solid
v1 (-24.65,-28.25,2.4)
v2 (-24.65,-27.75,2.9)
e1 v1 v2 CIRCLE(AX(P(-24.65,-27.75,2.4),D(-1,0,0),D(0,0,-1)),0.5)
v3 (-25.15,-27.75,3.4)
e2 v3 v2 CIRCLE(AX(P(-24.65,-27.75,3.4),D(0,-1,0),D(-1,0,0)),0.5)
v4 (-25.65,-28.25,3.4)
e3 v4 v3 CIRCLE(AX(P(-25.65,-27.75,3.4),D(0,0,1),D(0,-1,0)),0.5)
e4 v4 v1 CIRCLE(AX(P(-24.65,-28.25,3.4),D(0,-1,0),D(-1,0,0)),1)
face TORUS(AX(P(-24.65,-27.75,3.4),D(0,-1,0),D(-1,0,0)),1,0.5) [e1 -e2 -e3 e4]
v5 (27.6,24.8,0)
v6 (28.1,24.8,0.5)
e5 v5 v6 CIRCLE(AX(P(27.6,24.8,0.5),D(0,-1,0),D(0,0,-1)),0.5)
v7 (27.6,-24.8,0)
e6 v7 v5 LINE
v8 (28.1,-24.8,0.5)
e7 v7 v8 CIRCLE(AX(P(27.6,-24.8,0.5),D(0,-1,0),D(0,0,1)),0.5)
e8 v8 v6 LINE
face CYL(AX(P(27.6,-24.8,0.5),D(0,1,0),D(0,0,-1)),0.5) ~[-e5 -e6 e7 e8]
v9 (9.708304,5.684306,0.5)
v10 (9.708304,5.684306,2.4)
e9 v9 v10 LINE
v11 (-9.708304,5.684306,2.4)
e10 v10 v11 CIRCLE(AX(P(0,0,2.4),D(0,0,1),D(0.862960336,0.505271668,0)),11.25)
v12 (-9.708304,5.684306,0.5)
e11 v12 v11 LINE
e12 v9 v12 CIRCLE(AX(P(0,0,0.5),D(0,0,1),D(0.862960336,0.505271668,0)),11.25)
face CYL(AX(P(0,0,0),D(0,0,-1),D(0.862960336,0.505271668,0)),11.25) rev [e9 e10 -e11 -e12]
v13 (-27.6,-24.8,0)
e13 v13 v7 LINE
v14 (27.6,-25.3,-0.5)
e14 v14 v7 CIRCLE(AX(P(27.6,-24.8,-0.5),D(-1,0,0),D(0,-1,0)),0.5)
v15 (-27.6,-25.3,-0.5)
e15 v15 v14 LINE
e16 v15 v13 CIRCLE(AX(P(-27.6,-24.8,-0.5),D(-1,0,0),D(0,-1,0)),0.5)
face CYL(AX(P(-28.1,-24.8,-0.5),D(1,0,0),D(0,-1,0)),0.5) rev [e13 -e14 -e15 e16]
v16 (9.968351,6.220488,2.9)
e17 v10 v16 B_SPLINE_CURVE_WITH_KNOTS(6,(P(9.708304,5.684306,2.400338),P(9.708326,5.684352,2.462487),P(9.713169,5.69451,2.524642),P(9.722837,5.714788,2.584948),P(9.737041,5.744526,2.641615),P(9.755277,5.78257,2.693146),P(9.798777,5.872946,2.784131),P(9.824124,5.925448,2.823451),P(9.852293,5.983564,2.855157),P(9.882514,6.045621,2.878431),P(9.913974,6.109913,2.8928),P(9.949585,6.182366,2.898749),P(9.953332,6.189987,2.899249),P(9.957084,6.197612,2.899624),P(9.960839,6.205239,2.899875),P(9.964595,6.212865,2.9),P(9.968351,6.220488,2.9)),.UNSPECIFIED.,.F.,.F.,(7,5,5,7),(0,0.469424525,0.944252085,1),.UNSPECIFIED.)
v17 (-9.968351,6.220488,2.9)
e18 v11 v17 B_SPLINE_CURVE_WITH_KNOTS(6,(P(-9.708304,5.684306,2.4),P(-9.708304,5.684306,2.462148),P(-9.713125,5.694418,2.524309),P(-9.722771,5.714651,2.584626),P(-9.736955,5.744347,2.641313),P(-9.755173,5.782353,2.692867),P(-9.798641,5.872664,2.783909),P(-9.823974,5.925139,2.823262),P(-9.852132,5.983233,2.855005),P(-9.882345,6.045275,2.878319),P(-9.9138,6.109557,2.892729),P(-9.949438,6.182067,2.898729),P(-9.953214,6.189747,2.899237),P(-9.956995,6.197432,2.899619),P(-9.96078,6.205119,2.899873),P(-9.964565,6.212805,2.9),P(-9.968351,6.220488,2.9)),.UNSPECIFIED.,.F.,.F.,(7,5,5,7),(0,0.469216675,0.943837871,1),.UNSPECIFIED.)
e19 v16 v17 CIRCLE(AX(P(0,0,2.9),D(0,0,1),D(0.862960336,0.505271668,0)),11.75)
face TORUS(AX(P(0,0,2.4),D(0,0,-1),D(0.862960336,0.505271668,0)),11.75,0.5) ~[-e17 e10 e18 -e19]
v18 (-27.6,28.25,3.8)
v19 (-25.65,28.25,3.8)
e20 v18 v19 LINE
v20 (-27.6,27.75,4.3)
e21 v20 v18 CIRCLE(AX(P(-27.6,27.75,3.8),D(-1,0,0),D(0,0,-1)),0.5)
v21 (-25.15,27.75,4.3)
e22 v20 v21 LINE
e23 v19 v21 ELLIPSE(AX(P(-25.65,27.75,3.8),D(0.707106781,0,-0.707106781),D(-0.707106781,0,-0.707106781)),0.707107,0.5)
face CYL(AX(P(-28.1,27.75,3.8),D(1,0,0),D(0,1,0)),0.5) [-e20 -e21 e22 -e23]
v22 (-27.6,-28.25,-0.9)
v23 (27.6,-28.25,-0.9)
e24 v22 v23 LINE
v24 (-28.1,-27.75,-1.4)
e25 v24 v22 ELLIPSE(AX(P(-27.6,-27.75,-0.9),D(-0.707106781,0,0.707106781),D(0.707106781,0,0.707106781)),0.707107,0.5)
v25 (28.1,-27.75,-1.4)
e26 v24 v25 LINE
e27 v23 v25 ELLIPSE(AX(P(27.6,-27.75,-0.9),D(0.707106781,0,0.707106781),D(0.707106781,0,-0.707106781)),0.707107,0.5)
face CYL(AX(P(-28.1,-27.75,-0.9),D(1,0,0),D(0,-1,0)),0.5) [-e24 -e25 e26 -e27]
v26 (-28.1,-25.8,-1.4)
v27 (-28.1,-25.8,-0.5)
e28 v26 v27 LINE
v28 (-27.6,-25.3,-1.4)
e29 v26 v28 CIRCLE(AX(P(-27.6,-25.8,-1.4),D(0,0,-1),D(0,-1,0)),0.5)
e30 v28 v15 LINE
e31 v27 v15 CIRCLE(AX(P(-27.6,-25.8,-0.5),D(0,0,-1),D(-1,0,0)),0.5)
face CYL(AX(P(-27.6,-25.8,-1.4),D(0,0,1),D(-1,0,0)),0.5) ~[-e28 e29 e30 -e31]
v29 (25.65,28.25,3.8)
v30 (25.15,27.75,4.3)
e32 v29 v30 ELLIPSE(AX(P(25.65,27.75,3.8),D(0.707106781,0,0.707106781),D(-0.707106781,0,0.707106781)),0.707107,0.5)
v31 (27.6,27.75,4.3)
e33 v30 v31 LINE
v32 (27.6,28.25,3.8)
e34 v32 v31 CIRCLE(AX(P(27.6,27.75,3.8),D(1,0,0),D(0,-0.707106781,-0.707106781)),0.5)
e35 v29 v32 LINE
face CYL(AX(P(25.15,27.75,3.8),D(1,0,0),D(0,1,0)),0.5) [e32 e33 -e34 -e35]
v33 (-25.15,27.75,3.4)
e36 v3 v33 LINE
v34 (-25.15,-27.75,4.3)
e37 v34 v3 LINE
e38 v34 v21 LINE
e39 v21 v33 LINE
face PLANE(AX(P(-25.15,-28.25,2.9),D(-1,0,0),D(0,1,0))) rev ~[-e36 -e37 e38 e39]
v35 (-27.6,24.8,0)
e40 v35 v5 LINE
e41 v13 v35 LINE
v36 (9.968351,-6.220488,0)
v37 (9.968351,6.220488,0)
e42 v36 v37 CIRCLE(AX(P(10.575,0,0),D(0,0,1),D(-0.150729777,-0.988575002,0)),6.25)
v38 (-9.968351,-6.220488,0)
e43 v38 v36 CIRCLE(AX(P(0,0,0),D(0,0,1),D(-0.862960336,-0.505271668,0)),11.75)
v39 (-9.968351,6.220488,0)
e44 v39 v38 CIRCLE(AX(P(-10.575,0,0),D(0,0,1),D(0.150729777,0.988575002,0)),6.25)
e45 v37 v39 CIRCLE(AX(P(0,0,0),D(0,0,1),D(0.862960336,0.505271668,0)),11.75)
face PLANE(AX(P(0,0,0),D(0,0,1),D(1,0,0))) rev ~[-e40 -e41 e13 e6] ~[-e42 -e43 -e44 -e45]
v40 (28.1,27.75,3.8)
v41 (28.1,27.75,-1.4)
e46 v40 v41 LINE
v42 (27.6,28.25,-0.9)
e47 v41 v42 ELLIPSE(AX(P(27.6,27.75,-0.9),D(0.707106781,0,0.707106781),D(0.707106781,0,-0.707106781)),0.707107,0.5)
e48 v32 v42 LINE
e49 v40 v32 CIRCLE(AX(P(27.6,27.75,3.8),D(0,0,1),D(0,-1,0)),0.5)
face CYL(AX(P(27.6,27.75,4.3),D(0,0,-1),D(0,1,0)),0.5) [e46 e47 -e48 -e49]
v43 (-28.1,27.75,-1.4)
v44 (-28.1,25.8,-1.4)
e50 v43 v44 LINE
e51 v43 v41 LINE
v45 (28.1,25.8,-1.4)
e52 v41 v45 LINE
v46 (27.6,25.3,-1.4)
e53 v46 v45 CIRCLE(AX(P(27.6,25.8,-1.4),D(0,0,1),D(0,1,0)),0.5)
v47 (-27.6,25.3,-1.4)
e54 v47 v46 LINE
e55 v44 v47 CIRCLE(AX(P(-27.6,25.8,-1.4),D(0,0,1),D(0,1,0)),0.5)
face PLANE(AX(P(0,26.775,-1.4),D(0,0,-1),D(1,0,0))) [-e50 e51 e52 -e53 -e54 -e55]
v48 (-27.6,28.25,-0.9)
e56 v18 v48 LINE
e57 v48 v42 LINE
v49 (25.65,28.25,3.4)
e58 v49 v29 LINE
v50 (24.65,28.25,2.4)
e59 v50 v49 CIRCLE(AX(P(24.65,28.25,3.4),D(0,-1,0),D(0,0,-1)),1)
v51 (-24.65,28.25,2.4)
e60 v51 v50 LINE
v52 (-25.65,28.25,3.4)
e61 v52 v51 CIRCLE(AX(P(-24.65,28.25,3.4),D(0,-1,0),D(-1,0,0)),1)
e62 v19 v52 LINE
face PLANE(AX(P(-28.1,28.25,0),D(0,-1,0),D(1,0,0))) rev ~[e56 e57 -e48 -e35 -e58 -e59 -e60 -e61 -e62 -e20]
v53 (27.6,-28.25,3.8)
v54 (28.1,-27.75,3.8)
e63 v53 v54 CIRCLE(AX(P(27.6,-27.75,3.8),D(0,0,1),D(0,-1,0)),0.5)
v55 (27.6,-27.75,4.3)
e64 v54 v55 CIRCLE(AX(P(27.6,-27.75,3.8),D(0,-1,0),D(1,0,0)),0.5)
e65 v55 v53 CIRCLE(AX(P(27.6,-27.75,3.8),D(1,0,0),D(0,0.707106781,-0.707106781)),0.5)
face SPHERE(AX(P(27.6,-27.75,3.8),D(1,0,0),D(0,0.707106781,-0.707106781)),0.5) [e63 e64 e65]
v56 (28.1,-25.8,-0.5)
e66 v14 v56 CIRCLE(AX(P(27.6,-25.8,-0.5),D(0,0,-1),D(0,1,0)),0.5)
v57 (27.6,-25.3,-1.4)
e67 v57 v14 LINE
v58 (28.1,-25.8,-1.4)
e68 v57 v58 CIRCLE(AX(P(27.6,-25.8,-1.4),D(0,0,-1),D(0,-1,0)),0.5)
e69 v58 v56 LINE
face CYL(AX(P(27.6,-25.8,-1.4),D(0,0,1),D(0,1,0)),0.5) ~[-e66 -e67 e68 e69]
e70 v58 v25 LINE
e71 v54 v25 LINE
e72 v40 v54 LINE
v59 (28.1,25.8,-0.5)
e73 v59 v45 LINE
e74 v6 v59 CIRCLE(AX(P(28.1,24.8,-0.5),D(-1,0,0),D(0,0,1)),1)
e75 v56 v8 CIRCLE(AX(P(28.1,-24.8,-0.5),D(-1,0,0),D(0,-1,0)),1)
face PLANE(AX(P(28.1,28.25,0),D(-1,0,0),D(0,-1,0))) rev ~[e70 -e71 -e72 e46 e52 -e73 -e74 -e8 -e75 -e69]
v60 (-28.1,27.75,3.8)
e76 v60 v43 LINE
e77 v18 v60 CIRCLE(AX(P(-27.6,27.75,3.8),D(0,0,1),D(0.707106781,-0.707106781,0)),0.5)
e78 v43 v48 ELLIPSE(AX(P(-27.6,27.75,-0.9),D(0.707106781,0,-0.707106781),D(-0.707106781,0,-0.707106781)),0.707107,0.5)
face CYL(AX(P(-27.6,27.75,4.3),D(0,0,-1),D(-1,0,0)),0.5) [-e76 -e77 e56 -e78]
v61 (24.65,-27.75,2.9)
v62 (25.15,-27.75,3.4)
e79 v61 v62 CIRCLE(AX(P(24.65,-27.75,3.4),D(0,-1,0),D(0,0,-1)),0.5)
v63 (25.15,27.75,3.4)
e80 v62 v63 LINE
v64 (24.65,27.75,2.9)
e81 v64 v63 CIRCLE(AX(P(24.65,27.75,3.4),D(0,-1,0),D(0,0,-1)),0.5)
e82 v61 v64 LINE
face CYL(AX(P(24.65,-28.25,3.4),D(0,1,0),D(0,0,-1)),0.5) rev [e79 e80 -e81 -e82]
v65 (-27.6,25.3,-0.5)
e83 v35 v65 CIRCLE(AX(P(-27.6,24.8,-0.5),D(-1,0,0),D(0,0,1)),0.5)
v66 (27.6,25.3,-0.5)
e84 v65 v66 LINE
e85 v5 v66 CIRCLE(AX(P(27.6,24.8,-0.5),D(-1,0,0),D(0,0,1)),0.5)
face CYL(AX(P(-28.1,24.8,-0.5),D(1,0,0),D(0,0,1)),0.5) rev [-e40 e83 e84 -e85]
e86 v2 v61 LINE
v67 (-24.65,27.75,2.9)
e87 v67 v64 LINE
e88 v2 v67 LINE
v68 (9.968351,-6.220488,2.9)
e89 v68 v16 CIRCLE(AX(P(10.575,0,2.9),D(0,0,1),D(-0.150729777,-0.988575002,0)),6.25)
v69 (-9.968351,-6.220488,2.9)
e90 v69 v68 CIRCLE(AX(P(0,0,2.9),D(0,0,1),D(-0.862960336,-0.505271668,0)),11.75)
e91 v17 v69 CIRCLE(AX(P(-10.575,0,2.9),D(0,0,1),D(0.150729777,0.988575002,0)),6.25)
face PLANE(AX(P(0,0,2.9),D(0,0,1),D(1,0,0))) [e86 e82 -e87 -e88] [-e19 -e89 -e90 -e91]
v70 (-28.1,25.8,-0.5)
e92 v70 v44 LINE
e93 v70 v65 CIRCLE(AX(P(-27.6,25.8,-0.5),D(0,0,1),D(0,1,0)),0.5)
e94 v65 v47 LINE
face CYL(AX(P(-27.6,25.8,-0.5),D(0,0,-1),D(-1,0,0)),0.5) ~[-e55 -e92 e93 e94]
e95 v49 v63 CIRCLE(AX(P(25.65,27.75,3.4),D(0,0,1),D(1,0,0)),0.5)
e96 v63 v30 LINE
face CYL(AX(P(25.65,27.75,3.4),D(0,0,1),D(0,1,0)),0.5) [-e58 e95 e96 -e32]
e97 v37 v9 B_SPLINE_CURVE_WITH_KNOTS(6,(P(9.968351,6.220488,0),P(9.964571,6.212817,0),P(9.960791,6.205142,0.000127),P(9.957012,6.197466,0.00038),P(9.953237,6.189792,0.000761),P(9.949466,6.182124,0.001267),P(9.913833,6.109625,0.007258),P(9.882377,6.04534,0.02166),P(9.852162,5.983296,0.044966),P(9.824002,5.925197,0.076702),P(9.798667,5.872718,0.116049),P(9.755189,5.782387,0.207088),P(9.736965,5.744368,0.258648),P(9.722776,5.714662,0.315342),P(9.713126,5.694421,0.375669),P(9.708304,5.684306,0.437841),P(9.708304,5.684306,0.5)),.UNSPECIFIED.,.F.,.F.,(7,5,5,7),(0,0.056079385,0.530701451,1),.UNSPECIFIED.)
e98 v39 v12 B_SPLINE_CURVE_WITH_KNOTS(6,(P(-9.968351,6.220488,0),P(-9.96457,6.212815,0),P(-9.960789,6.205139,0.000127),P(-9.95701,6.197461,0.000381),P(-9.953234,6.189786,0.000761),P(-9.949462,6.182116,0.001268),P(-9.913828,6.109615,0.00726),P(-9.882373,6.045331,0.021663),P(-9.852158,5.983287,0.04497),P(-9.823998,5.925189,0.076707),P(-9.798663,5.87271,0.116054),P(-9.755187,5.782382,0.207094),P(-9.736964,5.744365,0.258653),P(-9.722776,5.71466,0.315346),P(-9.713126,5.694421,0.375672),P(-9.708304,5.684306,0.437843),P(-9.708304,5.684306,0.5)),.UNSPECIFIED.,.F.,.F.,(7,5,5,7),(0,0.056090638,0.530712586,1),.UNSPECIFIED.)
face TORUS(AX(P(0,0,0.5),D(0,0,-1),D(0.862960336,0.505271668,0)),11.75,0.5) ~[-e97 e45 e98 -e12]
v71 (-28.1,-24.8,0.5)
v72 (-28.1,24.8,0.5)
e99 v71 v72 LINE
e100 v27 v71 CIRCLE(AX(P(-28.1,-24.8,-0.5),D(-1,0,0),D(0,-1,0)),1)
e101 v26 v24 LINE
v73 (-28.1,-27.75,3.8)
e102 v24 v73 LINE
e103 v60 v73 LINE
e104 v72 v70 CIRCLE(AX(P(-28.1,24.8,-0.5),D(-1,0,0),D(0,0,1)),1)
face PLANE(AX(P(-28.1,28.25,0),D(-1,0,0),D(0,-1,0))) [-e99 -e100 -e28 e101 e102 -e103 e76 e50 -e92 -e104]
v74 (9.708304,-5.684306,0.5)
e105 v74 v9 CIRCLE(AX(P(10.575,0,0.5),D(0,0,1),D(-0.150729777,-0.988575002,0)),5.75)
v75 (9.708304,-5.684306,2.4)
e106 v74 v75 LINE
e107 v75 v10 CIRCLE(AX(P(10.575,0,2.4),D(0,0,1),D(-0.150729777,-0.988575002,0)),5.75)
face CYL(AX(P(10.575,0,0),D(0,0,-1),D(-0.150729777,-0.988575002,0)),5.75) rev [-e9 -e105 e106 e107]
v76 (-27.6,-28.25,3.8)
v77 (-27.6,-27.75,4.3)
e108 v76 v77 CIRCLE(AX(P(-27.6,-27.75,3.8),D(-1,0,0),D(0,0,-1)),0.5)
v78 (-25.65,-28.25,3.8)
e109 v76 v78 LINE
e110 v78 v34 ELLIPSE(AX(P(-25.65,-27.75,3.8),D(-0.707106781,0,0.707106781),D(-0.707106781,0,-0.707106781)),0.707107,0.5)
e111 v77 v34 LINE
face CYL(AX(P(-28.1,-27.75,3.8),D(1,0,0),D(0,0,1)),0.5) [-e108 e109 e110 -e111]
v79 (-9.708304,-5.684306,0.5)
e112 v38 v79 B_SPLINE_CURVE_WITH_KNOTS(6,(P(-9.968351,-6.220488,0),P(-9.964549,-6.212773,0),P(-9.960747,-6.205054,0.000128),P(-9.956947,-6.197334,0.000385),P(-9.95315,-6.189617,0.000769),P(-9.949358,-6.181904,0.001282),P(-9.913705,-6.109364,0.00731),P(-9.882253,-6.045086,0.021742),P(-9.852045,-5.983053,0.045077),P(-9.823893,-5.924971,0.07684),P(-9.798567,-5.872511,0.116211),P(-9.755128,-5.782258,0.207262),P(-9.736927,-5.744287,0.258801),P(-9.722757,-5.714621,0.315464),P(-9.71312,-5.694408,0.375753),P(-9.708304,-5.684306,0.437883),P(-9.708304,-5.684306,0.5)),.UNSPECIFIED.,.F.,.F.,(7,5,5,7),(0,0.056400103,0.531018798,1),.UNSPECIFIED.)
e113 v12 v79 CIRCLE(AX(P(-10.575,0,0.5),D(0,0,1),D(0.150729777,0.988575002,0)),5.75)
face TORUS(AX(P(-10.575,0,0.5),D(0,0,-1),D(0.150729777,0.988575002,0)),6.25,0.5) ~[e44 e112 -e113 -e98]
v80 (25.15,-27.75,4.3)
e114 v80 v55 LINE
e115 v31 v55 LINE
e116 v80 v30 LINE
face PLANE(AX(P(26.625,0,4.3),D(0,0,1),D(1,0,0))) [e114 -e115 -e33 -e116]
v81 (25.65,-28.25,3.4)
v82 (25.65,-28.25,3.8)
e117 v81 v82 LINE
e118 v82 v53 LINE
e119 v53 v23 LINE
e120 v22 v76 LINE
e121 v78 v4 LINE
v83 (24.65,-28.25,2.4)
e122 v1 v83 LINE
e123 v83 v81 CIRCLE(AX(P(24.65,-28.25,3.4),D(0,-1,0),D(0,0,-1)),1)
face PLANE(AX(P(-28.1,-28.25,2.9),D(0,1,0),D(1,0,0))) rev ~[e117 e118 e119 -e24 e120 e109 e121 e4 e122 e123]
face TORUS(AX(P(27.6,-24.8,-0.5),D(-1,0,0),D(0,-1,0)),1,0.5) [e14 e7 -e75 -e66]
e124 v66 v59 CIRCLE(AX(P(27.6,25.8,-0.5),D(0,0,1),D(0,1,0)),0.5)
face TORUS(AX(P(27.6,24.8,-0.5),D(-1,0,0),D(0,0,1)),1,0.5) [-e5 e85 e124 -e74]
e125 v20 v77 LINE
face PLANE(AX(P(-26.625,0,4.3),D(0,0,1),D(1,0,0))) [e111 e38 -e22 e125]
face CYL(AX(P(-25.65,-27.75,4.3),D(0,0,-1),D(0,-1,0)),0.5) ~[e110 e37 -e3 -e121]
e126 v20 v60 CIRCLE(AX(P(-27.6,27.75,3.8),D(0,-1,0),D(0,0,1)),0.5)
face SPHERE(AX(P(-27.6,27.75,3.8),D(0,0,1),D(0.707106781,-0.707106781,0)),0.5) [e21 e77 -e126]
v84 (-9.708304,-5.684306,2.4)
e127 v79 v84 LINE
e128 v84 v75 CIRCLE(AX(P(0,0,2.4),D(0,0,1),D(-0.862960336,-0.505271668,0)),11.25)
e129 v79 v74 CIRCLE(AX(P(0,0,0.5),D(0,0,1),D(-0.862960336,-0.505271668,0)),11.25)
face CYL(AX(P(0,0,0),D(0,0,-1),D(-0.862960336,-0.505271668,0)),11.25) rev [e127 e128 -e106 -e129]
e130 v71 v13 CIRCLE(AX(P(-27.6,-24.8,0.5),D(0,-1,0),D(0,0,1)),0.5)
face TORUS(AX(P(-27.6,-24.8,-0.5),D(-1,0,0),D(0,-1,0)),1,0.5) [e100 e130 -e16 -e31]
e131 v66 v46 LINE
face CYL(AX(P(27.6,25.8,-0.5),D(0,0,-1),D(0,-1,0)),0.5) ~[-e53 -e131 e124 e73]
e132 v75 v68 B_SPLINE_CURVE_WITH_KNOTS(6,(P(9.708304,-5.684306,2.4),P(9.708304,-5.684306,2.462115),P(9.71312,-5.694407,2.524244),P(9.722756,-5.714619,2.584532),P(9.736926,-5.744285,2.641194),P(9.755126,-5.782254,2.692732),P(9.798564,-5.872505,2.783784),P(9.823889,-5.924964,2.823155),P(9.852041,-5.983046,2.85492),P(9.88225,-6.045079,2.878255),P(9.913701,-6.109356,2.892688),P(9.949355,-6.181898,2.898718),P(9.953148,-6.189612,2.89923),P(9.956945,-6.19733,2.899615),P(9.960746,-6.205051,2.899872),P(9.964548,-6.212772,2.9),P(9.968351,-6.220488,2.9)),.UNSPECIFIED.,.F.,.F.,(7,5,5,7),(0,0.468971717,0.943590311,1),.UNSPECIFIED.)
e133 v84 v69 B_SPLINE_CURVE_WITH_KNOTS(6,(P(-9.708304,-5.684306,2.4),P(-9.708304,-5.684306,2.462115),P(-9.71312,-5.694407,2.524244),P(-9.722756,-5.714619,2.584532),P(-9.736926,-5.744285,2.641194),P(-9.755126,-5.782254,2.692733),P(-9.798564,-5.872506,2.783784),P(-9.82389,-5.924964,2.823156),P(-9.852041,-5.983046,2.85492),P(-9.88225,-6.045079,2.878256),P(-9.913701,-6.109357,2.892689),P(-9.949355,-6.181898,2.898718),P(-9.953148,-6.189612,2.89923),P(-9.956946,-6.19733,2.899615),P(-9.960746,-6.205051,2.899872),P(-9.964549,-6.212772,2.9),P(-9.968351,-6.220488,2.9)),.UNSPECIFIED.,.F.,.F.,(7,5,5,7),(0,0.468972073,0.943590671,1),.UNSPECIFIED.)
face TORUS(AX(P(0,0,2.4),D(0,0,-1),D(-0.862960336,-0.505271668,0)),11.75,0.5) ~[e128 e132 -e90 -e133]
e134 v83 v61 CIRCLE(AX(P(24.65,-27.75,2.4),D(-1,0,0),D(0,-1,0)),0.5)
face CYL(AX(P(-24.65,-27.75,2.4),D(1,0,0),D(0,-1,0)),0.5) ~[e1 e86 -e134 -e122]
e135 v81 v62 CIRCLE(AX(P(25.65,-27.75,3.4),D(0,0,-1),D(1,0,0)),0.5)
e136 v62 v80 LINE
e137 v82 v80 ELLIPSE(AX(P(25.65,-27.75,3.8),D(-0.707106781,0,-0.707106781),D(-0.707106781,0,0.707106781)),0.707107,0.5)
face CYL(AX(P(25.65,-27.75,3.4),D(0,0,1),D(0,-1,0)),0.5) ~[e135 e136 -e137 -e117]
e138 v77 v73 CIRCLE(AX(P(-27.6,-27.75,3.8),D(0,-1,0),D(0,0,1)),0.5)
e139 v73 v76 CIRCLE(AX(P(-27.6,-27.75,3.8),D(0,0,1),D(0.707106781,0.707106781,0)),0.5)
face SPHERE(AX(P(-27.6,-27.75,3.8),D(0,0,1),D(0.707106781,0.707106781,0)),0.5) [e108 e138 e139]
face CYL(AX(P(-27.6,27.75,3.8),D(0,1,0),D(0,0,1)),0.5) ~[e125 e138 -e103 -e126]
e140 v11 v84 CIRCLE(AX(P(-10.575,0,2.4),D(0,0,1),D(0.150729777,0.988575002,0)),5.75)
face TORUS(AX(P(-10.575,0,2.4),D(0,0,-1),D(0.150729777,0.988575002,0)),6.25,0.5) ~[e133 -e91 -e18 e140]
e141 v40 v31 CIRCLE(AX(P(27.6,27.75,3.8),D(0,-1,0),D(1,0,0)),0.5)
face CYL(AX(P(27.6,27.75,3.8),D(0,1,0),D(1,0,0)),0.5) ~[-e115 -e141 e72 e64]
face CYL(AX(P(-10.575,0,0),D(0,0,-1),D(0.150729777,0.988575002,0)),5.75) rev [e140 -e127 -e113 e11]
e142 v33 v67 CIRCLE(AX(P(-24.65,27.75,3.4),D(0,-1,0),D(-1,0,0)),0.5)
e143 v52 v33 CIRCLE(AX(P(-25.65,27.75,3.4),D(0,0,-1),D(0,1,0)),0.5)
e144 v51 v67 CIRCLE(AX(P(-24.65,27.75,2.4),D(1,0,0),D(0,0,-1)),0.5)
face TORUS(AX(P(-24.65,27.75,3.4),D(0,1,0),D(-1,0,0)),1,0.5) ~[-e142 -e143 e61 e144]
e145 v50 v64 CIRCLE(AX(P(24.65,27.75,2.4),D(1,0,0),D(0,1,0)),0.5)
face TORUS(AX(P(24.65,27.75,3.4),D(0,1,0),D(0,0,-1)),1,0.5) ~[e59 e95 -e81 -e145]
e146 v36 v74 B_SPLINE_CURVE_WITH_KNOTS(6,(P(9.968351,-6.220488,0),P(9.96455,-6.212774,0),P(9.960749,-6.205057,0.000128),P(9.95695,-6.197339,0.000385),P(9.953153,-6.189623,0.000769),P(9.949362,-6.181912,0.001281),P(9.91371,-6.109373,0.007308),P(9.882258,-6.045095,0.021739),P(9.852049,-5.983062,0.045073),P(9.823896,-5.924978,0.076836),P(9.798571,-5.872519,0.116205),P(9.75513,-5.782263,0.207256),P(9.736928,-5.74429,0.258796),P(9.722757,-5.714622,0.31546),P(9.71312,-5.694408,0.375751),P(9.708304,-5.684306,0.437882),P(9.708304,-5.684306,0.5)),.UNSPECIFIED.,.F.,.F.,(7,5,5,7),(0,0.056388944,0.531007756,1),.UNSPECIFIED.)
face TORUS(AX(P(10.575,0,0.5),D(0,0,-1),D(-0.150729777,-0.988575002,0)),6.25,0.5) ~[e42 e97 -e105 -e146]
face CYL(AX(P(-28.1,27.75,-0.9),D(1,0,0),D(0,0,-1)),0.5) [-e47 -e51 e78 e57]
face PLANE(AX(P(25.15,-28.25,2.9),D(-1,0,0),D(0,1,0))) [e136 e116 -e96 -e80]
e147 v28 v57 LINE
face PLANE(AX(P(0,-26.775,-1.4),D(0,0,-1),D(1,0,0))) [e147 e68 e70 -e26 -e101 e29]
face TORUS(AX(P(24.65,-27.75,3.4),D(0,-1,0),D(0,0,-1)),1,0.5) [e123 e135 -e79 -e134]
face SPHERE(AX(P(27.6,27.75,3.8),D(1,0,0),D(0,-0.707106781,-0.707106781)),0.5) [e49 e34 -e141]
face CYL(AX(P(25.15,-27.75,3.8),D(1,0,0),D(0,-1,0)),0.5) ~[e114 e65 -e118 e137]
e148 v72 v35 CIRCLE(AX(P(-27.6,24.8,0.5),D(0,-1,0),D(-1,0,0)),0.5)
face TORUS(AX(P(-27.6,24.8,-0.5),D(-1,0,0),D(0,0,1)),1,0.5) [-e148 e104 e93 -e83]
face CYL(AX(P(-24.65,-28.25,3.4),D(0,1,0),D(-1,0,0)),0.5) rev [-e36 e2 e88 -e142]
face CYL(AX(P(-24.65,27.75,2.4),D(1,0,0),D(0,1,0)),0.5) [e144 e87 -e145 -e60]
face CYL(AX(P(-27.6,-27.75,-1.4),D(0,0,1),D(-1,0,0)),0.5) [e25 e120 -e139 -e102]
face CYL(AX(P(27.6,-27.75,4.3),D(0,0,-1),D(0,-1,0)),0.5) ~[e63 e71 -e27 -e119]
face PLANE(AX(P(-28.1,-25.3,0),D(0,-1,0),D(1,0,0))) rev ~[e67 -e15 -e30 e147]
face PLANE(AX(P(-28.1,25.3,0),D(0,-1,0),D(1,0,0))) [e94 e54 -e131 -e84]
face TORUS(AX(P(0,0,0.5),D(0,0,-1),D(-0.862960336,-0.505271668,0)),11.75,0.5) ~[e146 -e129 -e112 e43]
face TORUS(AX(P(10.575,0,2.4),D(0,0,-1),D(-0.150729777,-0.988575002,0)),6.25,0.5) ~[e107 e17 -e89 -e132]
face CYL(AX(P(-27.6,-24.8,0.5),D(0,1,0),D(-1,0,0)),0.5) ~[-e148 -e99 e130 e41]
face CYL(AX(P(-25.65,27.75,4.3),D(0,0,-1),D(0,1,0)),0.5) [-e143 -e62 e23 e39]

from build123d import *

# Parameters (mm, degrees)
F0_W         = 56.2
F0_H         = 56.5
F1_DEPTH     = 2.9
F3_DEPTH     = 2.9
F4_W         = 2.95
F4_H         = 56.5
F5_DEPTH     = 1.4
F6_W         = 56.2
F6_H         = 2.95
F7_DEPTH     = 1.4
F8_F1_R      = 0.5
F8_F2_R      = 0.5
F9_T1_DEPTH  = 55.5
F9_S5_W      = 0.5
F9_S5_H      = 0.5
F9_T6_DEPTH  = 0.5
F9_S11_W     = 0.5
F9_S11_H     = 0.5
F9_T12_DEPTH = 0.5
F9_S17_W     = 0.5
F9_S17_H     = 0.5
F9_T18_DEPTH = 0.5
F9_S23_W     = 0.5
F9_S23_H     = 0.5
F9_T24_DEPTH = 0.5


# Not quite as in the source:
# - a fillet or chamfer that OpenCascade refuses, or shapes differently, is made with other operations: its cross-section is extruded or revolved along the edge and cut away or added


with BuildPart() as f1:
    # F0 (on Top) → F1 (new body)
    with BuildSketch(Plane.XY):
        Rectangle(F0_W, F0_H)
    extrude(amount=F1_DEPTH)

    # F2 (on Top) → F3 (cut, through all)
    with BuildSketch(Plane.XY):
        with BuildLine():
            ThreePointArc((9.7083037825, -5.6843062608), (16.325, 0), (9.7083037825, 5.6843062608))
            ThreePointArc((9.7083037825, 5.6843062608), (0, 11.25), (-9.7083037825, 5.6843062608))
            ThreePointArc((-9.7083037825, 5.6843062608), (-16.325, 0), (-9.7083037825, -5.6843062608))
            ThreePointArc((-9.7083037825, -5.6843062608), (0, -11.25), (9.7083037825, -5.6843062608))
        make_face()
    extrude(amount=F3_DEPTH, mode=Mode.SUBTRACT)

    # F4 (on face) → F5 (join)
    with BuildSketch(Plane.XY.offset(2.9)):
        with Locations((-26.625, 0)):
            Rectangle(F4_W, F4_H)
        with Locations((26.625, 0)):
            Rectangle(F4_W, F4_H)
    extrude(amount=F5_DEPTH)

    # F6 (on face) → F7 (join)
    with BuildSketch(Plane(origin=(0, 0, 0), x_dir=(1, 0, 0), z_dir=(0, 0, -1))):
        with Locations((0, -26.775)):
            Rectangle(F6_W, F6_H)
        with Locations((0, 26.775)):
            Rectangle(F6_W, F6_H)
    extrude(amount=F7_DEPTH)

    # F8: fillet of radius 0.5 on 30 edges, made by hand

    # F8_f1
    f8_f1_edges = [f1.edges().sort_by_distance(p)[0] for p in [
        (-25.15, 0, 2.9),
        (25.15, 0, 2.9),
        (0, 25.3, 0),
        (0, -25.3, 0),
    ]]
    fillet(f8_f1_edges, radius=F8_F1_R)

    # F8_f2
    f8_f2_edges = [f1.edges().sort_by_distance(p)[0] for p in [
        (0, 28.25, 2.9),
        (0, -28.25, 2.9),
        (16.325, 0, 2.9),
        (0, -11.25, 2.9),
        (0, 11.25, 2.9),
        (-16.325, 0, 2.9),
        (-28.1, 0, 0),
        (28.1, 0, 0),
        (16.325, 0, 0),
        (0, -11.25, 0),
        (0, 11.25, 0),
        (-16.325, 0, 0),
        (26.625, 28.25, 4.3),
        (25.15, 28.25, 3.85),
        (-25.15, 28.25, 3.85),
        (-26.625, 28.25, 4.3),
        (-28.1, 28.25, 1.45),
        (0, 28.25, -1.4),
        (28.1, 28.25, 1.45),
        (-28.1, -28.25, 1.45),
        (-26.625, -28.25, 4.3),
        (-25.15, -28.25, 3.85),
        (25.15, -28.25, 3.85),
        (26.625, -28.25, 4.3),
        (28.1, -28.25, 1.45),
        (0, -28.25, -1.4),
        (25.0035533906, -28.25, 3.0464466094),
        (-25.0035533906, -28.25, 3.0464466094),
        (-25.0035533906, 28.25, 3.0464466094),
        (25.0035533906, 28.25, 3.0464466094),
        (28.1, -25.1535533906, -0.1464466094),
        (28.1, 25.1535533906, -0.1464466094),
        (-28.1, 25.1535533906, -0.1464466094),
        (-28.1, -25.1535533906, -0.1464466094),
    ]]
    fillet(f8_f2_edges, radius=F8_F2_R)

    # F9: fillet of radius 0.5 on 2 edges, made by hand

    # F9_s2 → F9_t1 (cut)
    with BuildSketch(Plane.XZ.offset(-27.75)):
        with BuildLine():
            ThreePointArc((28.1, 3.8), (27.9535533906, 4.1535533906), (27.6, 4.3))
            Line((27.6, 4.3), (28.1, 4.3))
            Line((28.1, 4.3), (28.1, 3.8))
        make_face()
        with BuildLine():
            ThreePointArc((-27.6, 4.3), (-27.9535533906, 4.1535533906), (-28.1, 3.8))
            Line((-28.1, 3.8), (-28.1, 4.3))
            Line((-28.1, 4.3), (-27.6, 4.3))
        make_face()
    extrude(amount=F9_T1_DEPTH, mode=Mode.SUBTRACT)


with BuildPart() as f9_tool4:
    # F9_s5 → F9_t6 (new body)
    with BuildSketch(Plane.XY.offset(3.8)):
        with Locations((-27.85, 28)):
            Rectangle(F9_S5_W, F9_S5_H)
    extrude(amount=F9_T6_DEPTH)

    # F9_s7 → F9_t8 (revolve, cut)
    with BuildSketch(Plane(origin=(-27.6, 27.75, 3.8), x_dir=(0.7071067812, -0.7071067812, 0), z_dir=(-0.7071067812, -0.7071067812, 0))):
        with BuildLine():
            ThreePointArc((0, -0.5), (0.5, 0), (0, 0.5))
            Line((0, 0.5), (0, -0.5))
        make_face()
    revolve(axis=Axis((-27.6, 27.75, 3.8), (0, 0, 1)), mode=Mode.SUBTRACT)


with BuildPart() as f1_1:
    add(f1.part)

    # F9_t3: cut F9_tool4
    add(f9_tool4.part, mode=Mode.SUBTRACT)


with BuildPart() as f9_tool10:
    # F9_s11 → F9_t12 (new body)
    with BuildSketch(Plane.XY.offset(3.8)):
        with Locations((-27.85, -28)):
            Rectangle(F9_S11_W, F9_S11_H)
    extrude(amount=F9_T12_DEPTH)

    # F9_s13 → F9_t14 (revolve, cut)
    with BuildSketch(Plane(origin=(-27.6, -27.75, 3.8), x_dir=(0.7071067812, 0.7071067812, 0), z_dir=(0.7071067812, -0.7071067812, 0))):
        with BuildLine():
            ThreePointArc((0, -0.5), (0.5, 0), (0, 0.5))
            Line((0, 0.5), (0, -0.5))
        make_face()
    revolve(axis=Axis((-27.6, -27.75, 3.8), (0, 0, 1)), mode=Mode.SUBTRACT)


with BuildPart() as f1_2:
    add(f1_1.part)

    # F9_t9: cut F9_tool10
    add(f9_tool10.part, mode=Mode.SUBTRACT)


with BuildPart() as f9_tool16:
    # F9_s17 → F9_t18 (new body)
    with BuildSketch(Plane.YZ.offset(27.6)):
        with Locations((-28, 4.05)):
            Rectangle(F9_S17_W, F9_S17_H)
    extrude(amount=F9_T18_DEPTH)

    # F9_s19 → F9_t20 (revolve, cut)
    with BuildSketch(Plane(origin=(27.6, -27.75, 3.8), x_dir=(0, 0.7071067812, -0.7071067812), z_dir=(0, -0.7071067812, -0.7071067812))):
        with BuildLine():
            ThreePointArc((0, -0.5), (0.5, 0), (0, 0.5))
            Line((0, 0.5), (0, -0.5))
        make_face()
    revolve(axis=Axis((27.6, -27.75, 3.8), (1, 0, 0)), mode=Mode.SUBTRACT)


with BuildPart() as f1_3:
    add(f1_2.part)

    # F9_t15: cut F9_tool16
    add(f9_tool16.part, mode=Mode.SUBTRACT)


with BuildPart() as f9_tool22:
    # F9_s23 → F9_t24 (new body)
    with BuildSketch(Plane.YZ.offset(27.6)):
        with Locations((28, 4.05)):
            Rectangle(F9_S23_W, F9_S23_H)
    extrude(amount=F9_T24_DEPTH)

    # F9_s25 → F9_t26 (revolve, cut)
    with BuildSketch(Plane(origin=(27.6, 27.75, 3.8), x_dir=(0, -0.7071067812, -0.7071067812), z_dir=(0, -0.7071067812, 0.7071067812))):
        with BuildLine():
            ThreePointArc((0, -0.5), (0.5, 0), (0, 0.5))
            Line((0, 0.5), (0, -0.5))
        make_face()
    revolve(axis=Axis((27.6, 27.75, 3.8), (1, 0, 0)), mode=Mode.SUBTRACT)


with BuildPart() as f1_4:
    add(f1_3.part)

    # F9_t21: cut F9_tool22
    add(f9_tool22.part, mode=Mode.SUBTRACT)


solid = f1_4.part
